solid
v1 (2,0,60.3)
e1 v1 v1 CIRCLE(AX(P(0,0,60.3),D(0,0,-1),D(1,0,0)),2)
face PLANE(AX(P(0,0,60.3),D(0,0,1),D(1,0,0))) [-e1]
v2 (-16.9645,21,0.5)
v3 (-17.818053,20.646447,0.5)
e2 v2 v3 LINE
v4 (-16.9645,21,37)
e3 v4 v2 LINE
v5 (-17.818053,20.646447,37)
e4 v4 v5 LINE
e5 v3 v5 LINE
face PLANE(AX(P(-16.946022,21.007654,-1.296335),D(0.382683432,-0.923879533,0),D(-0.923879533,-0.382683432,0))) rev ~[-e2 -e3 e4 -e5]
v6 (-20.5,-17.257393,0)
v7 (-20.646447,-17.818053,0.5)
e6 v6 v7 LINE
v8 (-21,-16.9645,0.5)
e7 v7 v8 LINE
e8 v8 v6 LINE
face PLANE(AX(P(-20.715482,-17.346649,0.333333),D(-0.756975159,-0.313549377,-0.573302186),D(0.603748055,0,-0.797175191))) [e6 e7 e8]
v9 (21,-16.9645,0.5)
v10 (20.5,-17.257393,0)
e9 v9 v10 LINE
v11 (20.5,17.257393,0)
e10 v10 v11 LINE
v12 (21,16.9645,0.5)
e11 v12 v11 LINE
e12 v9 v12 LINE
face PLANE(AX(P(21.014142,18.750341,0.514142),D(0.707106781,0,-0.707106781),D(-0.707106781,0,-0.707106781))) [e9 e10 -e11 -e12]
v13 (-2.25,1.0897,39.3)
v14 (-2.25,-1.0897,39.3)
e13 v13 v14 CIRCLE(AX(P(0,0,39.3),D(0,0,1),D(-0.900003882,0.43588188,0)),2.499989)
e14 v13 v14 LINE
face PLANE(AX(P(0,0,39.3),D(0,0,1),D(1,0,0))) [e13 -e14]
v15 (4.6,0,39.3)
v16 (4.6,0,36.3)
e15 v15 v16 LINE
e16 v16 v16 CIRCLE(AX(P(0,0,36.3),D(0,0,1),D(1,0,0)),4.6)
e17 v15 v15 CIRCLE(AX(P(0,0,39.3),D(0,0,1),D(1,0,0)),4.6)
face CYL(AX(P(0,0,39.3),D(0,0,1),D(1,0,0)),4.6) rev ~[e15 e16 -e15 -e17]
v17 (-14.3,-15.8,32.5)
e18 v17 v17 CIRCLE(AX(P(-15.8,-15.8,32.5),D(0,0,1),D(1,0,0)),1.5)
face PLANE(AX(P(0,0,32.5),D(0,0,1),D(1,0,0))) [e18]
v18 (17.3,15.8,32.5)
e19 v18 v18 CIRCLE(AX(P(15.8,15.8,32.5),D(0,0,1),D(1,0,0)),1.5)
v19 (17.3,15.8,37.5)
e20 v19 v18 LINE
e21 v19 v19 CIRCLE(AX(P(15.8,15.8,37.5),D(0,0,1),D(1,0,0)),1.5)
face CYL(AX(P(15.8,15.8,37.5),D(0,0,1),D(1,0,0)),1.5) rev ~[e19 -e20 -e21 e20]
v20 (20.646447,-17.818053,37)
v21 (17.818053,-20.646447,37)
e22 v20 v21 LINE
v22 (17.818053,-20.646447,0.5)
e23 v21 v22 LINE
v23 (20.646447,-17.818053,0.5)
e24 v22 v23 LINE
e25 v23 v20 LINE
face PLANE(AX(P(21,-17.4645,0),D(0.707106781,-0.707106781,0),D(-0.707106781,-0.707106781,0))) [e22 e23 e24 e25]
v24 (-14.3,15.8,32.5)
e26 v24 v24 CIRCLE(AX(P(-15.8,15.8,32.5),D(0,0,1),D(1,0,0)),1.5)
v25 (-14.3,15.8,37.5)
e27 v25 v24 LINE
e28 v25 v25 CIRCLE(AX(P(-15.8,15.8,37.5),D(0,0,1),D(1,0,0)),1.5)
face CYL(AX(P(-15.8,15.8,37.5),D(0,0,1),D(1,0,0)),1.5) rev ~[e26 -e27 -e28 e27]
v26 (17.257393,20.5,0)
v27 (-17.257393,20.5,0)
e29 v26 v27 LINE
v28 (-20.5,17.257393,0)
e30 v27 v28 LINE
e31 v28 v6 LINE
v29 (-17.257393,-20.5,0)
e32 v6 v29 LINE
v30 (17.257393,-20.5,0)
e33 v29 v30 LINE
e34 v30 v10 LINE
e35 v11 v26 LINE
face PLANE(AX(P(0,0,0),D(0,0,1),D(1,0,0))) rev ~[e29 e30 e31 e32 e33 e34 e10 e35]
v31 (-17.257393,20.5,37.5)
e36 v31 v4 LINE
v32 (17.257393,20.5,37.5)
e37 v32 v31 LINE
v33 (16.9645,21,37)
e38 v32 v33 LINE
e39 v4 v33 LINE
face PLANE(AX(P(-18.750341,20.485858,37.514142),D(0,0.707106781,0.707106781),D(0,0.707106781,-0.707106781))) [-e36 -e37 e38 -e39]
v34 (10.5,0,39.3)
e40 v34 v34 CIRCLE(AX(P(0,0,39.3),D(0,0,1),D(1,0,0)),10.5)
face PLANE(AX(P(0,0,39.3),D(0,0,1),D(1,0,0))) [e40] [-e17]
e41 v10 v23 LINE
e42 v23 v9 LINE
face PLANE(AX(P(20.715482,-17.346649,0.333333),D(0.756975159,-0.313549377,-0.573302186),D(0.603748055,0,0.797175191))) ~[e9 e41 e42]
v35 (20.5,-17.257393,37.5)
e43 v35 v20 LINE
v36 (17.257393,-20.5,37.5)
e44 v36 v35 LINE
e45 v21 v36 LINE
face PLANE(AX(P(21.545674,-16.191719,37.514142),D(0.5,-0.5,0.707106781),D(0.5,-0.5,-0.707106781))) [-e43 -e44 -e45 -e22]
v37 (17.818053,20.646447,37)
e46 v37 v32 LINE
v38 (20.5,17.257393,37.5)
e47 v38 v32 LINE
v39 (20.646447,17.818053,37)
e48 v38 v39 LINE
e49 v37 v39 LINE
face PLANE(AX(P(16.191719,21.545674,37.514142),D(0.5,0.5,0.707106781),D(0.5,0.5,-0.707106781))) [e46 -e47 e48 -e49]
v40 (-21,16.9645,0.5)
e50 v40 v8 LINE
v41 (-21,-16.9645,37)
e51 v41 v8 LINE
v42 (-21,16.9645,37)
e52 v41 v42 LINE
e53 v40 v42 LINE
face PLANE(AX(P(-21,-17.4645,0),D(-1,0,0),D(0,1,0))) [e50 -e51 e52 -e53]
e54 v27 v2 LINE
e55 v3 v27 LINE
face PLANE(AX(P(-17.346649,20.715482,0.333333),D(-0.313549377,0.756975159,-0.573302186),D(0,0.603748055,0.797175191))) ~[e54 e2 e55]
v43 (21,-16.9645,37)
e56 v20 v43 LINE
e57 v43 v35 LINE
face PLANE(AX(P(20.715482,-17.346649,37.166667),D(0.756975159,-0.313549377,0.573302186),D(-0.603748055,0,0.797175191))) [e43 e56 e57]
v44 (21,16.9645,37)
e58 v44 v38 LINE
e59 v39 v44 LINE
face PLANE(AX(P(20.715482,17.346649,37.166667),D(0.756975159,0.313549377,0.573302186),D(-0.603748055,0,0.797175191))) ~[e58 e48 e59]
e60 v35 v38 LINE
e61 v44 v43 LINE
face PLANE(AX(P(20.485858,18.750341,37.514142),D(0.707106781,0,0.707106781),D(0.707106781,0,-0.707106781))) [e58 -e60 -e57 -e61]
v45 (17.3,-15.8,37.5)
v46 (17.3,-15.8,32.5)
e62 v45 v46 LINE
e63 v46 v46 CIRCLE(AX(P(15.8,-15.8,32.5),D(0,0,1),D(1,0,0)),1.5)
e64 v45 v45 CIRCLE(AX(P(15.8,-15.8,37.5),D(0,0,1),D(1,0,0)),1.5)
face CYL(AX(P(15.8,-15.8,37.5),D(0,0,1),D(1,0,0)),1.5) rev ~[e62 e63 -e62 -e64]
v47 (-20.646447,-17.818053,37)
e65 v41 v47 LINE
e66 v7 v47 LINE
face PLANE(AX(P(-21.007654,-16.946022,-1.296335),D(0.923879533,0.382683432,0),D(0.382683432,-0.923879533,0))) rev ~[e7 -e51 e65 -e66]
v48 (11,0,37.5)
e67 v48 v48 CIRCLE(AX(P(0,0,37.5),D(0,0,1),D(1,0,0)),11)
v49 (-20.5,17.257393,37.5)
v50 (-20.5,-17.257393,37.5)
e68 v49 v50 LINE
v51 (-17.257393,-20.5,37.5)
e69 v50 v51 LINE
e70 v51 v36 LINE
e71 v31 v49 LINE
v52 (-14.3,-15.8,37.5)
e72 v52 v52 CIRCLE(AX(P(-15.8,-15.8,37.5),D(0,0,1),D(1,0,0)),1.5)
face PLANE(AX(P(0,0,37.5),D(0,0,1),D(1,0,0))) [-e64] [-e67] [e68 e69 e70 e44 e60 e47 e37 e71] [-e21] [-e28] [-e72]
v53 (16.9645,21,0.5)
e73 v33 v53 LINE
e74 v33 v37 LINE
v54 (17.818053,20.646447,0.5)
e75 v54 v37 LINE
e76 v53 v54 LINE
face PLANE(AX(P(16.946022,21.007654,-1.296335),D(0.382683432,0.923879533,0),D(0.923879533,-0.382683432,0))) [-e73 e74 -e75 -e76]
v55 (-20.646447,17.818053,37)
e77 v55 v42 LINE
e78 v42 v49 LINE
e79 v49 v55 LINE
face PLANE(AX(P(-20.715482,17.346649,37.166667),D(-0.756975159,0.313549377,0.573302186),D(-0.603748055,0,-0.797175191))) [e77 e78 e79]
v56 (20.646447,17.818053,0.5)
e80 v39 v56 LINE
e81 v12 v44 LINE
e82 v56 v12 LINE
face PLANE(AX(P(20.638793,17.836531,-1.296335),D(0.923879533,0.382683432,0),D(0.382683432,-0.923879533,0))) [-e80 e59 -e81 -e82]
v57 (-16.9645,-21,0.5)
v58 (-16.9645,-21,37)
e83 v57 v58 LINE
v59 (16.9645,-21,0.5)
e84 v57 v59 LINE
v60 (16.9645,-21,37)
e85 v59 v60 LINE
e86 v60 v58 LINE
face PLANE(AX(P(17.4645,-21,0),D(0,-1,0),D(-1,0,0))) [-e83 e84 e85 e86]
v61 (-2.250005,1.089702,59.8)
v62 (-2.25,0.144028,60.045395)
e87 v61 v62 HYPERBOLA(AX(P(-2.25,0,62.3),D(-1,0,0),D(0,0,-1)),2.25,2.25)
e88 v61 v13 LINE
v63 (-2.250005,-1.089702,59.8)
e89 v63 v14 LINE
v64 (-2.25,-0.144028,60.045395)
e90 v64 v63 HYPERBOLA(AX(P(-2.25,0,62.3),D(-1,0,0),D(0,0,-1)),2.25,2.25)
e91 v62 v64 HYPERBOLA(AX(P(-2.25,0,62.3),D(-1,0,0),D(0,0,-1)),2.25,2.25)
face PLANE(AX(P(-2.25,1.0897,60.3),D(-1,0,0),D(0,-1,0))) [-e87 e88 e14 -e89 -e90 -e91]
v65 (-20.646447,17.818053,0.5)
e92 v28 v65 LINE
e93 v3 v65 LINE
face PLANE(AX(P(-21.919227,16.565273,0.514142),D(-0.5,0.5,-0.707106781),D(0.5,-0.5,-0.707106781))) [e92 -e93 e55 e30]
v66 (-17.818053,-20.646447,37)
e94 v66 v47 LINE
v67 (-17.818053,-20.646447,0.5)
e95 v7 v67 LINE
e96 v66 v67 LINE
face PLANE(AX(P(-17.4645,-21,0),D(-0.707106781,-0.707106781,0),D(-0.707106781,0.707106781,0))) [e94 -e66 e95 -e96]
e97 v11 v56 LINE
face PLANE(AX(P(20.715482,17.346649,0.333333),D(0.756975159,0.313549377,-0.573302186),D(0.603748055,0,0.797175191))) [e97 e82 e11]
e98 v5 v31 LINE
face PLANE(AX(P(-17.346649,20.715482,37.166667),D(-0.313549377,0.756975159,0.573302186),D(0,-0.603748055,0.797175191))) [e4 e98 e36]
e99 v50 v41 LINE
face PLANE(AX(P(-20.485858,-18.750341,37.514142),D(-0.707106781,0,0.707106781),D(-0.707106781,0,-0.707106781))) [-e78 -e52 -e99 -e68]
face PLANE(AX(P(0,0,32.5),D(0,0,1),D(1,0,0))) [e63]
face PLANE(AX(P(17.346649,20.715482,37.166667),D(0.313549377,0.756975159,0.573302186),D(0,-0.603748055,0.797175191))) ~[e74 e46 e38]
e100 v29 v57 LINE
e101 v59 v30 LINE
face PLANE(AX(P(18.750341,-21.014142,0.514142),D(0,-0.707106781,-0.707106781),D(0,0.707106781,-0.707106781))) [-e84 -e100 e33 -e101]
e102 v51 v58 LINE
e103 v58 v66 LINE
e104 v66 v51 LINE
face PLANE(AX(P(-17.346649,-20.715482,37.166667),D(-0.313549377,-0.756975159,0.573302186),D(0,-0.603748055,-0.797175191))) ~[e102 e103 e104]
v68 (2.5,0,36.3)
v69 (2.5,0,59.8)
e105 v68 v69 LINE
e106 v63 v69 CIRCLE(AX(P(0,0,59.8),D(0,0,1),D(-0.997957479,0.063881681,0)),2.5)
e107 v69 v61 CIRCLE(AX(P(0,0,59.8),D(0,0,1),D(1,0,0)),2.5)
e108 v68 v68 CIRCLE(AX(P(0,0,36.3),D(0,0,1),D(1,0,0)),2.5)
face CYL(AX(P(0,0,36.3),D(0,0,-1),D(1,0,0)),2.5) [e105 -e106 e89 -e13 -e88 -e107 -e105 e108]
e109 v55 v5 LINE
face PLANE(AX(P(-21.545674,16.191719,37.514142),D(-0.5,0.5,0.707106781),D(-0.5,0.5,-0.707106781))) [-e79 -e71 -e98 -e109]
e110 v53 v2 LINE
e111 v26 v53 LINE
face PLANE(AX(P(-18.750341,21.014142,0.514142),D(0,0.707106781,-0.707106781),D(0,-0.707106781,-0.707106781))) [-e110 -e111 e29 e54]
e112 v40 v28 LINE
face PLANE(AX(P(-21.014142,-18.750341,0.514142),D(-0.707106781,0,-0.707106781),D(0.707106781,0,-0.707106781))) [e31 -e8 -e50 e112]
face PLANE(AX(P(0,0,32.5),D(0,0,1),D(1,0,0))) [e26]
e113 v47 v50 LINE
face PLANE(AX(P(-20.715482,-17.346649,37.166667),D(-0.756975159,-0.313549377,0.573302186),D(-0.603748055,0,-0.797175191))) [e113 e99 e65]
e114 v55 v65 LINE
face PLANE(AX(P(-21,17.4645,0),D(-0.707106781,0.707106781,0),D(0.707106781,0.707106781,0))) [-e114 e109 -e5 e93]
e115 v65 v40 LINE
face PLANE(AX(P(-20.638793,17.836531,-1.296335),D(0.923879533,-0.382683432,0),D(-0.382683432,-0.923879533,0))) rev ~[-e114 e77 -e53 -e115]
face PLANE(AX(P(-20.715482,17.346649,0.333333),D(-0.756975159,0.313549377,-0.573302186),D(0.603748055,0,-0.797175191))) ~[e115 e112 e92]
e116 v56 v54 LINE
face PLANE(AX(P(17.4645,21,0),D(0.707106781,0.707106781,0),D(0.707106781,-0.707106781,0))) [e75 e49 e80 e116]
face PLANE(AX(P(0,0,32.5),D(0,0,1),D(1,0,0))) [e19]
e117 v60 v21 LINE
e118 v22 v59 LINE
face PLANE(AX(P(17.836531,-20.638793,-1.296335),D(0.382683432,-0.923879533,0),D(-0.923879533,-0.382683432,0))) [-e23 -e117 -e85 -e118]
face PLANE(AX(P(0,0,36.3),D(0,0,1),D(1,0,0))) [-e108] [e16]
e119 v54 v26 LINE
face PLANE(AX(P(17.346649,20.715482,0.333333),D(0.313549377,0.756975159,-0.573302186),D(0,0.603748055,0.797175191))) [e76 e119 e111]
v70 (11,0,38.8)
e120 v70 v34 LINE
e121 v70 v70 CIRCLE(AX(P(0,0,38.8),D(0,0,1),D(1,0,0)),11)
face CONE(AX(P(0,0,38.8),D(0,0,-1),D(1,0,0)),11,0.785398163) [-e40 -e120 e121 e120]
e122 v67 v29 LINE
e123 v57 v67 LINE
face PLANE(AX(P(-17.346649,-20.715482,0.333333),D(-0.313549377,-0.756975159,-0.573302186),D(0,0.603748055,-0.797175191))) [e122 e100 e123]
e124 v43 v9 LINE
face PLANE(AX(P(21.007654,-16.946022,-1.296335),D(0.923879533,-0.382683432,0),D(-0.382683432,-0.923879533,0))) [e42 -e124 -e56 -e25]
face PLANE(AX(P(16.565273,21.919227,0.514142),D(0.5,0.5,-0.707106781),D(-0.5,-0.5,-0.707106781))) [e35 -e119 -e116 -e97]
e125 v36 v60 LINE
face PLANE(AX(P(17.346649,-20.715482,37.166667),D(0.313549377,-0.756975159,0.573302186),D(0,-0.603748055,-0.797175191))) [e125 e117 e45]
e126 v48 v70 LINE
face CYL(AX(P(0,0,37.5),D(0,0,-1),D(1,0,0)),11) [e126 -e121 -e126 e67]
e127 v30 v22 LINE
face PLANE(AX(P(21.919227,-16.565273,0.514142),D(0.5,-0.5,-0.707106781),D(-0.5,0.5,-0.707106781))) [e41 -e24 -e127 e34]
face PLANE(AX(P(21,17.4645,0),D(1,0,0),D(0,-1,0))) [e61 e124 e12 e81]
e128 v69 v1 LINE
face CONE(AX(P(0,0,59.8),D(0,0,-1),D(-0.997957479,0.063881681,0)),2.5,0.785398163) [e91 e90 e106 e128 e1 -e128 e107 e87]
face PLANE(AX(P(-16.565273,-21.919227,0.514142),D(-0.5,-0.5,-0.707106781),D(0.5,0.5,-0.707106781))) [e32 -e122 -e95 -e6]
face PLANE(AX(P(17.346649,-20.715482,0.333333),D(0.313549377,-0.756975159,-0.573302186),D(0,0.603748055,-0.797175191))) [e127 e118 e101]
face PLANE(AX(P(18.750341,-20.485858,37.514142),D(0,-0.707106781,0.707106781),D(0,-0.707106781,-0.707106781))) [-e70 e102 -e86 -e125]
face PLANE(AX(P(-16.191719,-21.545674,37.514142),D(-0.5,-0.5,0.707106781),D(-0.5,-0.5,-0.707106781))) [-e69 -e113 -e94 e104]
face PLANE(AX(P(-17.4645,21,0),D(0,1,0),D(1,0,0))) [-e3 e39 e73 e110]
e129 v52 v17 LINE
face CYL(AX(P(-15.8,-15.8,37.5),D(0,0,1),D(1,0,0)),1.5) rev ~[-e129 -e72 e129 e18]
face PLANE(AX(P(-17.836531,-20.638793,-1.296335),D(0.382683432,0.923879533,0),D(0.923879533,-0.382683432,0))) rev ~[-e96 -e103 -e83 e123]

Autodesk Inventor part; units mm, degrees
ref_plane "YZ Plane" through (0, 0, 0) normal (1, 0, 0) x (0, 1, 0)
ref_plane "XZ Plane" through (0, 0, 0) normal (0, 1, 0) x (-1, 0, 0)
ref_plane "XY Plane" through (0, 0, 0) normal (0, 0, 1) x (1, 0, 0)
sketch "Sketch1" plane through (0, 0, 0) normal (0, 0, 1) x (1, 0, 0)
  line L0 (-17.4645, 21) -> (17.4645, 21)
  line L1 (21, 17.4645) -> (21, -17.4645)
  line L2 (17.4645, -21) -> (-17.4645, -21)
  line L3 (-21, -17.4645) -> (-21, 17.4645)
  line L4 (-21, 17.4645) -> (-17.4645, 21)
  line L5 (-21, 17.4645) -> (-16, 17.4645) construction
  line L6 (-17.4645, -21) -> (-21, -17.4645)
  line L7 (21, -17.4645) -> (17.4645, -21)
  line L8 (17.4645, 21) -> (21, 17.4645)
  point P0 (0, 0)
  point P1 (0, 21)
  point P2 (-21, 0)
  dimension "d4" = 360
  dimension "d1" = 45
  dimension "d6" = 5
  dimension "d7" = 42
  dimension "d8" = 42
extrude "Extrusion1" add sketch "Sketch1" along normal blind 37.5
sketch "Sketch2" plane through (0, 0, 37.5) normal (0, 0, 1) x (1, 0, 0)
  circle A0 centre (0, 0) radius 11
  dimension "d11" = 22
extrude "Extrusion2" add sketch "Sketch2" along normal blind 1.8
sketch "Sketch3" plane through (0, 0, 39.3) normal (0, 0, 1) x (1, 0, 0)
  circle A0 centre (0, 0) radius 4.6
  dimension "d14" = 9.2
extrude "Extrusion3" cut sketch "Sketch3" against normal blind 3
sketch "Sketch4" plane through (0, 0, 36.3) normal (0, 0, 1) x (1, 0, 0)
  circle A0 centre (0, 0) radius 2.5
  dimension "d17" = 5
extrude "Extrusion4" add sketch "Sketch4" along normal blind 24
sketch "Sketch5" plane through (0, 0, 60.3) normal (0, 0, 1) x (1, 0, 0)
  arc A0 (-2.25, 1.0897) -> (-2.25, -1.0897) centre (0, 0) ccw
  line L0 (-2.25, 1.0897) -> (-2.25, -1.0897)
  circle A1 centre (0, 0) radius 2.5 projected
  dimension "d20" = 2.25
extrude "Extrusion5" cut sketch "Sketch5" against normal blind 21 contours L0 A0
chamfer "Chamfer1" distance 0.5 angle 45 2 edges at (0.559, -2.4367, 60.3) (0.559, 2.4367, 60.3)
sketch "Sketch6" plane through (0, 0, 37.5) normal (0, 0, 1) x (1, 0, 0)
  circle A0 centre (-15.8, 15.8) radius 1.5
  circle A1 centre (15.8, 15.8) radius 1.5
  circle A2 centre (-15.8, -15.8) radius 1.5
  circle A3 centre (15.8, -15.8) radius 1.5
  point P0 (0, 0)
  dimension "d27" = 15.8
  dimension "d28" = 31.6
  dimension "d29" = 15.8
  dimension "d30" = 31.6
  dimension "d31" = 3
extrude "Extrusion6" cut sketch "Sketch6" against normal blind 5
thread "Thread1" size "M3x0.5" class "6H" standard "ANSI Metric M Profile" full length
thread "Thread2" size "M3x0.5" class "6H" standard "ANSI Metric M Profile" full length
thread "Thread3" size "M3x0.5" class "6H" standard "ANSI Metric M Profile" full length
thread "Thread4" size "M3x0.5" class "6H" standard "ANSI Metric M Profile" full length
chamfer "Chamfer2" distance 0.5 angle 45 1 edges at (-11, 0, 39.3)
chamfer "Chamfer3" distance 0.5 angle 45 24 edges at (0, -21, 0) (19.2322, -19.2322, 0) (21, 0, 0) (-21, 0, 0) (0, 21, 0) (21, 0, 37.5) (0, 21, 37.5) (-21, 0, 37.5) (0, -21, 37.5) (19.2322, 19.2322, 37.5) (-19.2322, -19.2322, 37.5) (19.2322, -19.2322, 37.5) (17.4645, -21, 18.75) (21, -17.4645, 18.75) (-17.4645, -21, 18.75) (-21, -17.4645, 18.75) (21, 17.4645, 18.75) (17.4645, 21, 18.75) (-17.4645, 21, 18.75) (-21, 17.4645, 18.75) (-19.2322, 19.2322, 0) (-19.2322, -19.2322, 0) (19.2322, 19.2322, 0) (-19.2322, 19.2322, 37.5)
equation "\"d27\" = 0.5 * d28"
equation "\"d29\" = d27"
equation "\"d30\" = d28"
properties part number "Stepper Motor"
